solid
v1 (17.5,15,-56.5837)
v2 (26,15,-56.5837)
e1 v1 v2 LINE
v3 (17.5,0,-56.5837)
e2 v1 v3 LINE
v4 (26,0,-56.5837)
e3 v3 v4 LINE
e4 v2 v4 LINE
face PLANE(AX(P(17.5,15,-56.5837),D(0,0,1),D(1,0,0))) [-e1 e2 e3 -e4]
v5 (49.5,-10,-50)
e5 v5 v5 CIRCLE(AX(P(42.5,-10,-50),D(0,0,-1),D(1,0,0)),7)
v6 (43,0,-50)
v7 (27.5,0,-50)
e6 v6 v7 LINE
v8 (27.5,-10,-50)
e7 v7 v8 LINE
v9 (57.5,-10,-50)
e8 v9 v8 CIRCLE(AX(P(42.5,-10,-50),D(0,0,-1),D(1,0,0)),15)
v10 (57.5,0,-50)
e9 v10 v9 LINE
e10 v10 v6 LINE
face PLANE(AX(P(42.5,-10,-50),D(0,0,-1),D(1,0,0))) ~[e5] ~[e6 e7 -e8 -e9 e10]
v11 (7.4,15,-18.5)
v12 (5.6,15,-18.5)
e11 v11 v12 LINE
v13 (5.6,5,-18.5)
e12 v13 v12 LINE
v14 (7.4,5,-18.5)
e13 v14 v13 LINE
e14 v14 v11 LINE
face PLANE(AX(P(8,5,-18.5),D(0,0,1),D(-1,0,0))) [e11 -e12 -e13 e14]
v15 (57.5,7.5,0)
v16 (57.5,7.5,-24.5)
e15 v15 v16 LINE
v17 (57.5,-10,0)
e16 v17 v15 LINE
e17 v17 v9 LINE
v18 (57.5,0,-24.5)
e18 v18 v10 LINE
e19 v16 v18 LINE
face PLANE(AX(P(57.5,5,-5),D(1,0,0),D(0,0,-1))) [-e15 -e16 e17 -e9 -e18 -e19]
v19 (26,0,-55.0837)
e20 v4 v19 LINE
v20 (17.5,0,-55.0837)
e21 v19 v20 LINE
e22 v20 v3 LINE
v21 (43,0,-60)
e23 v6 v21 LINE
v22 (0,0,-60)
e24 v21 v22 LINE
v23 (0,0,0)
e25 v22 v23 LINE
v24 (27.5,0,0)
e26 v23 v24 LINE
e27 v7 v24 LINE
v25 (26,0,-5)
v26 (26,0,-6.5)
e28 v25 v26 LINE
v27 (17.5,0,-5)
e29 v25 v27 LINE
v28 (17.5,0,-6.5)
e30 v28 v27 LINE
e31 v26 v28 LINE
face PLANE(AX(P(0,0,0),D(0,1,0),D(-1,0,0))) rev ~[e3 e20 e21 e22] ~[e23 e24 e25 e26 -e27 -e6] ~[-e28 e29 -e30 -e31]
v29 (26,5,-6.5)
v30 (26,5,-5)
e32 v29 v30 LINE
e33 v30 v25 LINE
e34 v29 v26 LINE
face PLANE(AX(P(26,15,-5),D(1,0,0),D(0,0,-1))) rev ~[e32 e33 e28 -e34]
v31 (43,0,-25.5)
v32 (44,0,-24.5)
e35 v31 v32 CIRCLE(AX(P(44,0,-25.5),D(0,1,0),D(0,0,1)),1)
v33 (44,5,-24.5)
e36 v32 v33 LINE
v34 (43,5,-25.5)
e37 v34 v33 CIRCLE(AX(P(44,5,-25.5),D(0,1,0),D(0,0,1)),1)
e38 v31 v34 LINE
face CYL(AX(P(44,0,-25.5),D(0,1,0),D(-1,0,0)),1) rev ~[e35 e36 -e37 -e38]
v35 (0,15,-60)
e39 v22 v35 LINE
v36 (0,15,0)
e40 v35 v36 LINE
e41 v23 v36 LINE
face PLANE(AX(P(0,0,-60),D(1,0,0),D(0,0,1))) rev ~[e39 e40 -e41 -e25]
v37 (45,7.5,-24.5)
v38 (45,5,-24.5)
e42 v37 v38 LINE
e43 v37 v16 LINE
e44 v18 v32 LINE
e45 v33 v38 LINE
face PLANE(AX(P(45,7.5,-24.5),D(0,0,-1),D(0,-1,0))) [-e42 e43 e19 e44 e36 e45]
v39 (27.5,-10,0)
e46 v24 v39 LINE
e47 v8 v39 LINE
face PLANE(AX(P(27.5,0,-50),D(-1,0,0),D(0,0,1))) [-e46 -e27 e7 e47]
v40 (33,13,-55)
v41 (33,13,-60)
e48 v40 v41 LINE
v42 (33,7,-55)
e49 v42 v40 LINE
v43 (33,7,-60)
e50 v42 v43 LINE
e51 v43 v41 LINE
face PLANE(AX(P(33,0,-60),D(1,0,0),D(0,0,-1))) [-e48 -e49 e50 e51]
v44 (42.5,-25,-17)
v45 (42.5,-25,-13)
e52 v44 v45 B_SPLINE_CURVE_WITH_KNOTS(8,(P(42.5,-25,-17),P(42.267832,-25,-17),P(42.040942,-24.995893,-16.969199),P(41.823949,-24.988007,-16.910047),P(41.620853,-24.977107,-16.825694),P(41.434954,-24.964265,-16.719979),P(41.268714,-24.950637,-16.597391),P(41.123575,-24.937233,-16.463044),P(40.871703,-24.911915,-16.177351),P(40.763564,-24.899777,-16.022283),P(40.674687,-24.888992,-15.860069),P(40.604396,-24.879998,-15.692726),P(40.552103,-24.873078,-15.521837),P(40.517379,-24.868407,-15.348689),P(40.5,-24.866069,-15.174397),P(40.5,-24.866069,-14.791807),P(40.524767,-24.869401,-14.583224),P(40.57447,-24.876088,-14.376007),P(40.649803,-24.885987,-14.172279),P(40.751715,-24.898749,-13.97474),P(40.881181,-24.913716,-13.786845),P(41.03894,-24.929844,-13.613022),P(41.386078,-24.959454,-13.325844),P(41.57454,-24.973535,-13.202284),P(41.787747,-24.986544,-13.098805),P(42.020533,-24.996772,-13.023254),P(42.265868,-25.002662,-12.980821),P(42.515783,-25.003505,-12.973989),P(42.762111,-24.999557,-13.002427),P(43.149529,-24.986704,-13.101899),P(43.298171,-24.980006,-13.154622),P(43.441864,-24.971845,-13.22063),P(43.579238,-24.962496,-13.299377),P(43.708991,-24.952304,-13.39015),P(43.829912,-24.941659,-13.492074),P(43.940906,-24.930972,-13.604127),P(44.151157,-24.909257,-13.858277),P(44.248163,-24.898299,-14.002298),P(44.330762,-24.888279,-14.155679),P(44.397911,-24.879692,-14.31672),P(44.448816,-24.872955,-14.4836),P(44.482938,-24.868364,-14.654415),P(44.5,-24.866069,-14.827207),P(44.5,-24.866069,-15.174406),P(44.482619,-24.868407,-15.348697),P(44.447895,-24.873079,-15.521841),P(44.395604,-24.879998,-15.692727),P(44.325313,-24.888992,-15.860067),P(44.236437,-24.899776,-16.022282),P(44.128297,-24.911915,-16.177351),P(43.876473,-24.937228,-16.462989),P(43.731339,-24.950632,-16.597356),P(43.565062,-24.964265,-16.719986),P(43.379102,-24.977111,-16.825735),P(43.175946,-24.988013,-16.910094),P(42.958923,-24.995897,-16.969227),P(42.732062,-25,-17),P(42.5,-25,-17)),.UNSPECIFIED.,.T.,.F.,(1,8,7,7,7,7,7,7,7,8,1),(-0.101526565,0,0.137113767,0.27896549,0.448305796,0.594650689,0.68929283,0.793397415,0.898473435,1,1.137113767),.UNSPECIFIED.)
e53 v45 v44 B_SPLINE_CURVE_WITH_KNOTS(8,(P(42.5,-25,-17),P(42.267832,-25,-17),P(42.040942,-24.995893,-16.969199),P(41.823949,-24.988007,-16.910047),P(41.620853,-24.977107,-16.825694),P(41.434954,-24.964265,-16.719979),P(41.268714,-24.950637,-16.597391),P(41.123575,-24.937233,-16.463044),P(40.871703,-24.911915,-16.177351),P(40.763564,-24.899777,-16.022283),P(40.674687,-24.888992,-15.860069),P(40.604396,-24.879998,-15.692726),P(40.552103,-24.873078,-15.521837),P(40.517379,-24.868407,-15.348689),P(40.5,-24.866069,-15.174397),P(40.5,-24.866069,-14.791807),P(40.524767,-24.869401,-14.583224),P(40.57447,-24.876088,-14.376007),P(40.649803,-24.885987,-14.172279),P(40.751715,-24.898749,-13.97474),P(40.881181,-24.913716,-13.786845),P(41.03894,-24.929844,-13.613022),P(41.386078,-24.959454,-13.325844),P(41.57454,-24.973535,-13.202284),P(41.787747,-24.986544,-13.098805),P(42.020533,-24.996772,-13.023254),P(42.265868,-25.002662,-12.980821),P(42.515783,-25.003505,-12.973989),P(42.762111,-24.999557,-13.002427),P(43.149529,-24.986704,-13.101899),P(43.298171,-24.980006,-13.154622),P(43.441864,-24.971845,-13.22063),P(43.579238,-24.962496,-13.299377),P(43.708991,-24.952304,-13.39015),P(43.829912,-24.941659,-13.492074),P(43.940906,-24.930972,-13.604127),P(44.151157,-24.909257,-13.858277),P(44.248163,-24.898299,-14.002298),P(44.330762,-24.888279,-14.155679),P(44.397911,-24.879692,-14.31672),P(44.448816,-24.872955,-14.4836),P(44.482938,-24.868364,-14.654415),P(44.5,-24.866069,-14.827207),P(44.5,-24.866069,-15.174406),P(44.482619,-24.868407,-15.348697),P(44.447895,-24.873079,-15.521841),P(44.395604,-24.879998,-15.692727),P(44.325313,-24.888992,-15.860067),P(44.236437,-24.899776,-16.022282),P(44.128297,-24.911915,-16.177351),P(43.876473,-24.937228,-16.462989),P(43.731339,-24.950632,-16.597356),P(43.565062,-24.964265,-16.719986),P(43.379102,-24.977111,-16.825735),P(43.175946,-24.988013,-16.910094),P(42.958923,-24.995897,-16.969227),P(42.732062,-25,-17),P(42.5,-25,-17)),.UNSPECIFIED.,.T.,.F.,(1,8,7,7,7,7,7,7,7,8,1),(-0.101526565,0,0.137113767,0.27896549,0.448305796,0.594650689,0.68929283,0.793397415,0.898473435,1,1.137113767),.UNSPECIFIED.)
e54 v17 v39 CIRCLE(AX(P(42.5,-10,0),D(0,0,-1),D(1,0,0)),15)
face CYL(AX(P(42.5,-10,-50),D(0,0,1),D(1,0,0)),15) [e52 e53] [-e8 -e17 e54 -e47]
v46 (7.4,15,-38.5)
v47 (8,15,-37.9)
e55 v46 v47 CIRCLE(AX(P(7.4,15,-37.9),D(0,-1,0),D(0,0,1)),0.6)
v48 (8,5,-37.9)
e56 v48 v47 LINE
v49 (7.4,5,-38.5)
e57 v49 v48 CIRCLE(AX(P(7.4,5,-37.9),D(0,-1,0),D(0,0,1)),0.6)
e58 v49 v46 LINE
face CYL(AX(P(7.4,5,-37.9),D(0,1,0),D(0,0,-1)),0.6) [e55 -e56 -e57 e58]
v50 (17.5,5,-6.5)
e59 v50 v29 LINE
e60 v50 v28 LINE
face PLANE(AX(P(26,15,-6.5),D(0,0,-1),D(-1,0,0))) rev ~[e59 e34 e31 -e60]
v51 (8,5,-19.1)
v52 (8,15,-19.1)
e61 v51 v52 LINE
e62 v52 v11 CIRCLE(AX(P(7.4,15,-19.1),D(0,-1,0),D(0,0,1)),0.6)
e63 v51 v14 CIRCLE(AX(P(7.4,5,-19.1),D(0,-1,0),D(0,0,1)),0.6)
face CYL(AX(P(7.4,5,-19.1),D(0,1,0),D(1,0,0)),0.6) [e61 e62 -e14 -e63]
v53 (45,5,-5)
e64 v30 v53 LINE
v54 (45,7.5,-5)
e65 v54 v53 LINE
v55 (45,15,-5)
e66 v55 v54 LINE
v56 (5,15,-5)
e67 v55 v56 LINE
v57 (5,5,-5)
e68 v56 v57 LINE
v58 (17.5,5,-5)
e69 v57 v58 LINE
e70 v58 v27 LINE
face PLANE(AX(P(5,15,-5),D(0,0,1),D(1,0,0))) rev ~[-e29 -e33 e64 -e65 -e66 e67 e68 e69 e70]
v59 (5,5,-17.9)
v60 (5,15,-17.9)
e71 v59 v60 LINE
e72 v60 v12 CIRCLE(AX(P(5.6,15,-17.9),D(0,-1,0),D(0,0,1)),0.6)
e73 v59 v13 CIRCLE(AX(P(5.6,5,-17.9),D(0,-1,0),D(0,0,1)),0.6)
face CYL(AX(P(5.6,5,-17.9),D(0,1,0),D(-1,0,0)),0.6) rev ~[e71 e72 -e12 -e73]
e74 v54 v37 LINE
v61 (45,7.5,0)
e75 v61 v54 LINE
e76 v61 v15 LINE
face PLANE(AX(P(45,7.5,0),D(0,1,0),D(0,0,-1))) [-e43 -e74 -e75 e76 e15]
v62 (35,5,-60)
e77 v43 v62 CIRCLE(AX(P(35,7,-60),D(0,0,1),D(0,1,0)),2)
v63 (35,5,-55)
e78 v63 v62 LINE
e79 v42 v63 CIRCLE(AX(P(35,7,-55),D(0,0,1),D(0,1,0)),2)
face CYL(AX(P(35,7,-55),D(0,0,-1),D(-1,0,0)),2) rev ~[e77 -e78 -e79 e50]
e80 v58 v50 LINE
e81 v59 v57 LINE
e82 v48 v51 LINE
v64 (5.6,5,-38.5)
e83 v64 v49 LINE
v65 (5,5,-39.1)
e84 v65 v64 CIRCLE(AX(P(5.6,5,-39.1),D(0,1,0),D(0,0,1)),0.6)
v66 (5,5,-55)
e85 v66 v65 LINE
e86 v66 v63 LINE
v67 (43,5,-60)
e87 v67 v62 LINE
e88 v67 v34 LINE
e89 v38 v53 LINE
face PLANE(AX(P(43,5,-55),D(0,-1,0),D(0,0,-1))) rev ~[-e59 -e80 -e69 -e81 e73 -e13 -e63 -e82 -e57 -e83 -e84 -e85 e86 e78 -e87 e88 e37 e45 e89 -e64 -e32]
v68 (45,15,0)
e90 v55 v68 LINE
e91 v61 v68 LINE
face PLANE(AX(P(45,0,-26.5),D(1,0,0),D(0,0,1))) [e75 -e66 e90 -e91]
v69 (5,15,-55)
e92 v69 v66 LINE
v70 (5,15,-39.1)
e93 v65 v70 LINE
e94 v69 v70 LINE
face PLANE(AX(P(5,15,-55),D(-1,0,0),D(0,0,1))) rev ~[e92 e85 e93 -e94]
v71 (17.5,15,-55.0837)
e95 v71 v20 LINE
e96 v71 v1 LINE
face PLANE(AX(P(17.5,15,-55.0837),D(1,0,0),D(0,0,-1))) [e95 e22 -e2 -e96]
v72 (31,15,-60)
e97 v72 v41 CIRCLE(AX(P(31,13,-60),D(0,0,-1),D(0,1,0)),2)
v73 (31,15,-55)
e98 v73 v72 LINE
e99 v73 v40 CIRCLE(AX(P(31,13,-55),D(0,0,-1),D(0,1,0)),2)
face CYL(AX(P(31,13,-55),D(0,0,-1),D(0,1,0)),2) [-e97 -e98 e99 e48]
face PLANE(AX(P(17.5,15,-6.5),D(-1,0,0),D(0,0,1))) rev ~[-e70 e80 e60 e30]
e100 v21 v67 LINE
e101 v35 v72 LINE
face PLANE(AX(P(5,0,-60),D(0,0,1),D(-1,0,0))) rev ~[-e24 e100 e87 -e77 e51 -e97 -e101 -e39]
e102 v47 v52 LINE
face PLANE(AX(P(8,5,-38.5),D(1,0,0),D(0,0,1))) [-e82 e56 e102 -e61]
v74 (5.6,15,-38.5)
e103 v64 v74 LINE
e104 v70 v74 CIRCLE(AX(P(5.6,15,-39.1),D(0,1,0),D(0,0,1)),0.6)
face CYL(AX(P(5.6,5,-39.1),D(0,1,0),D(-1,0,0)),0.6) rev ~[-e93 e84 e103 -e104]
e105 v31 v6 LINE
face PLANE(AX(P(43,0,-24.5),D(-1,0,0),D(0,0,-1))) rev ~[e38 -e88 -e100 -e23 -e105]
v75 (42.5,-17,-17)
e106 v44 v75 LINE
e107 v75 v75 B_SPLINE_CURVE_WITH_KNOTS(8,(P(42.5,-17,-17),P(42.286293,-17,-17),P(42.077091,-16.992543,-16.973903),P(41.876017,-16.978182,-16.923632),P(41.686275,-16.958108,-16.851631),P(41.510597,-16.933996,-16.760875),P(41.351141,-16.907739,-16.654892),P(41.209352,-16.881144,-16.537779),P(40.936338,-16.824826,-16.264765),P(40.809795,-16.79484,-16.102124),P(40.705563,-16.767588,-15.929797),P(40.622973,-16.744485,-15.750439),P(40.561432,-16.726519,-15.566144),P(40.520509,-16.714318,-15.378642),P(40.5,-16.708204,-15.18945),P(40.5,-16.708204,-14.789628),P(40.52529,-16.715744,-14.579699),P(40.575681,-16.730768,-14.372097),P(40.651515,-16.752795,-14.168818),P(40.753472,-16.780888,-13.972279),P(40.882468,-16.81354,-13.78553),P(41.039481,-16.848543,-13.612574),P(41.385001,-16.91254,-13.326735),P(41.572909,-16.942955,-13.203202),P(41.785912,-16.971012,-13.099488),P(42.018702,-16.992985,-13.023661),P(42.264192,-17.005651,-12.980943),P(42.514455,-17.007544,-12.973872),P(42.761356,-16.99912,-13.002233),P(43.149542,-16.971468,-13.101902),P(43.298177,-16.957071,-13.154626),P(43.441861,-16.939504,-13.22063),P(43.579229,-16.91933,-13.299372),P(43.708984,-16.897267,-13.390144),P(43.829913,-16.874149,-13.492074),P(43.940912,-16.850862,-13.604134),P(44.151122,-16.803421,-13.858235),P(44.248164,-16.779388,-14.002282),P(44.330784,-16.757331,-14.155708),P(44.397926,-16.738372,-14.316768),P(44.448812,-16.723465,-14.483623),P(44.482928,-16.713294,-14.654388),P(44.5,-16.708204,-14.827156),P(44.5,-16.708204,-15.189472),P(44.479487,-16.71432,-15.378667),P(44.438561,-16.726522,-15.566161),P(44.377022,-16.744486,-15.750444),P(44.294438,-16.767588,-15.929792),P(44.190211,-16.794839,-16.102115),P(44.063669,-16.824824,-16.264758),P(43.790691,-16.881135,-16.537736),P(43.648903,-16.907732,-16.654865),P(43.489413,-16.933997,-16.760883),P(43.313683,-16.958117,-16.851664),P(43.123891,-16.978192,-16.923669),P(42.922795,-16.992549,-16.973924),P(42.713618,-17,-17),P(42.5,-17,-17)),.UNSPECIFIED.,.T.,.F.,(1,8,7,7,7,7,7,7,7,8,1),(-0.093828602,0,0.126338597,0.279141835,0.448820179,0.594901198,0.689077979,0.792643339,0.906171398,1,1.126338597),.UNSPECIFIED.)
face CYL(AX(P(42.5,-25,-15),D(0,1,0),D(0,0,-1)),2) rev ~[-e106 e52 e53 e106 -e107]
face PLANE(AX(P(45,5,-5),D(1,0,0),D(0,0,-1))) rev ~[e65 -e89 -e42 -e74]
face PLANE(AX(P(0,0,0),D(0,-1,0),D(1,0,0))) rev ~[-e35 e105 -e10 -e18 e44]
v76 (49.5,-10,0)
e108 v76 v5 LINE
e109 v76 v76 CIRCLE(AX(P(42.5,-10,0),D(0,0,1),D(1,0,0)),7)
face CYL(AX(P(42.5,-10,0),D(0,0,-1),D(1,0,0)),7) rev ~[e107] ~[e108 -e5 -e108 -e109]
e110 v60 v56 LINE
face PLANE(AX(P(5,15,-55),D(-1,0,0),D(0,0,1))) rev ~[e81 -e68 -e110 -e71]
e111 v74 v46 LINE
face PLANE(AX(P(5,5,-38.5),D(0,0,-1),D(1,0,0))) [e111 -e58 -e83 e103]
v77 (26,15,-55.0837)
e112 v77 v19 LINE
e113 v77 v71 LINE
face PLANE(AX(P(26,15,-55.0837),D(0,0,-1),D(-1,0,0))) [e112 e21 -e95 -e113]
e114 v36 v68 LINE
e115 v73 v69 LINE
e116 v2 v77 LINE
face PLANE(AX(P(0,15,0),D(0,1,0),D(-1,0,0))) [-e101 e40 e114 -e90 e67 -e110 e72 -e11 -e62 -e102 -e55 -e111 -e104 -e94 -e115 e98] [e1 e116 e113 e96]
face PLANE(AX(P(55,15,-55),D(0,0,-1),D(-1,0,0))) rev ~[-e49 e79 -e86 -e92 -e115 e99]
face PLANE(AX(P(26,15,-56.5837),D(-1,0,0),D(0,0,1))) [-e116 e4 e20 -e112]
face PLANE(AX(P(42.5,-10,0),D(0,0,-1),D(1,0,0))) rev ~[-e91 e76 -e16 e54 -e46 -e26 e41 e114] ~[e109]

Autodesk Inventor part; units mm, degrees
ref_plane "YZ Plane" through (0, 0, 0) normal (1, 0, 0) x (0, 1, 0)
ref_plane "XZ Plane" through (0, 0, 0) normal (0, 1, 0) x (-1, 0, 0)
sketch "Sketch1" plane through (0, 0, 0) normal (0, 1, 0) x (-1, 0, 0)
  line L0 (0, 0) -> (0, -60)
  line L1 (0, 0) -> (-50, 0)
  line L2 (-5, -60) -> (-5, -5)
  line L3 (-5, -5) -> (-50, -5)
  line L4 (-47.5, 69.0442) -> (-47.5, -71.5611) construction
  line L5 (-50, 0) -> (-55, 0)
  line L6 (-55, 0) -> (-55, -50)
  line L7 (-55, -50) -> (-75, -50)
  line L8 (-75, -50) -> (-75, -60)
  line L9 (-75, -60) -> (-45, -60)
  line L10 (-5, -60) -> (-21, -60)
  circle A0 centre (-47.5, -73.124) radius 8.5
  line L11 (16.7028, -43.5) -> (-102.7124, -43.5) construction
  line L12 (-45, -26.5) -> (-50, -26.5)
  line L13 (-50, -26.5) -> (-50, -60.5)
  line L14 (-50, -60.5) -> (-45, -60.5)
  line L15 (-45, -60.5) -> (-45, -26.5)
  line L16 (-45, -43.5) -> (-50, -43.5) construction
  line L17 (-21, -60) -> (-21, -67.124)
  line L18 (-21, -67.124) -> (-30, -67.124)
  line L19 (-39, -67.124) -> (-39, -60)
  line L20 (-39, -60) -> (-45, -60) construction
  line L21 (-15.952, -100.4576) -> (-35.952, -100.4576)
  line L22 (-35.952, -108.4576) -> (-15.952, -108.4576)
  line L23 (-15.952, -108.4576) -> (-15.952, -100.4576)
  line L24 (-15.952, -73.124) -> (-76.4965, -73.124) construction
  line L25 (-30, -57.9879) -> (-30, -83.8601) construction
  line L26 (-25.952, -100.4576) -> (-25.952, -108.4576) construction
  line L27 (-45, -31) -> (-50, -31) construction
  line L28 (-50, -31) -> (-50, -56)
  line L29 (-50, -56) -> (-45, -56) construction
  line L30 (-45, -56) -> (-45, -31)
  line L31 (-45, -56) -> (-50, -56)
  line L32 (-45, -65.1391) -> (-45, -56)
  line L33 (-45, -56) -> (-50, -56)
  line L34 (-50, -56) -> (-50, -65)
  line L35 (-50, -65) -> (-45, -65)
  line L36 (-45, -65) -> (-45, -56)
  arc A1 (-35.952, -108.4576) -> (-35.952, -100.4576) centre (-43.452, -104.4576) ccw
  line L37 (-30, -67.124) -> (-39, -67.124)
  point P0 (-47.5, -43.5)
  point P1 (-30, -73.124)
  dimension "d9" = 17
  dimension "d0" = 60
  dimension "d1" = 50
  dimension "d2" = 5
  dimension "d3" = 47.5
  dimension "d4" = 5
  dimension "d5" = 50
  dimension "d6" = 20
  dimension "d7" = 30
  dimension "d10" = 38.5
  dimension "d11" = 5
  dimension "d12" = 34
  dimension "d13" = 20
  dimension "d14" = 8
  dimension "d57" = 25
  dimension "d58" = 4.5
  dimension "d59" = 5
  dimension "d60" = 9
  dimension "d61" = 17
  dimension "d62" = 9
  dimension "d63" = 9
  dimension "d64" = 9
  dimension "d65" = 6
sketch "Sketch2" plane through (0, 0, 0) normal (0, 1, 0) x (-1, 0, 0)
  line L0 (0, 0) -> (-45, 0)
  line L1 (-45, -60) -> (0, -60)
  line L2 (0, -60) -> (0, 0)
  line L3 (-5, -60) -> (-21, -60) projected
  line L4 (-30, -67.124) -> (-39, -67.124) projected
  line L5 (-57.5, -67.124) -> (-72, -67.124)
  line L6 (-72, -67.124) -> (-72, -59.124)
  line L7 (-72, -59.124) -> (-60, -59.124)
  line L8 (-60, -59.124) -> (-60, 0)
  line L9 (-57.5, -67.124) -> (-57.5, -60)
  line L10 (-45, -60.5) -> (-45, -26.5) projected
  line L11 (-45, -60) -> (-45, 0)
  point P0 (-60, -55)
  point P1 (-60, -67.124)
  dimension "d16" = 57.5
  dimension "d73" = 8
extrude "Extrusion1" add sketch "Sketch2" along normal blind 15
sketch "Sketch3" plane through (0, 15, 0) normal (0, 1, 0) x (1, 0, 0)
  line L0 (5, 5) -> (55, 5)
  line L1 (55, 5) -> (55, 55)
  line L2 (55, 55) -> (5, 55)
  line L3 (5, 55) -> (5, 5)
  line L4 (0, 0) -> (45, 0) projected
  line L5 (0, 60) -> (0, 0) projected
  point P0 (60, 0)
  dimension "d23" = 5
  dimension "d24" = 5
  dimension "d25" = 50
  dimension "d26" = 50
extrude "Extrusion2" cut sketch "Sketch3" against normal blind 10
sketch "Sketch5" plane through (0, 0, 0) normal (0, -1, 0) x (1, 0, 0)
  line L0 (45, -60) -> (0, -60) projected
  line L1 (45, -60.5) -> (45, -26.5) projected
  line L2 (5, -60) -> (5, -5) projected
  line L3 (50, -26.5) -> (50, -60.5) projected
  line L4 (45, -26.5) -> (50, -26.5) projected
  line L5 (50, -60.5) -> (45, -60.5) projected
  line L6 (52, -60) -> (52, -24.5)
  line L7 (52, -24.5) -> (43, -24.5)
  line L8 (43, -24.5) -> (43, -60)
  line L9 (52, -60.5) -> (52, -60)
  line L10 (52, -60) -> (43, -60)
  point P0 (80, -60)
  point P1 (57.5, -60)
  dimension "d30" = 40
  dimension "d31" = 2
extrude "Extrusion3" cut sketch "Sketch5" against normal through all contours L0 L8 L7 L6 L10 L3 L4 L1 | L1 L4 L3 L10
sketch "Sketch8" plane through (0, 5, 0) normal (0, 1, 0) x (1, 0, 0)
  line L0 (36, 11.5) -> (39, 11.5)
  line L1 (39, 11.5) -> (39, 43.5)
  line L2 (39, 43.5) -> (36, 43.5)
  line L3 (36, 43.5) -> (36, 11.5)
  line L4 (45, 60.5) -> (45, 26.5) projected
  line L5 (-16.7028, 43.5) -> (102.7124, 43.5) construction
  point P0 (0, 0)
  point P1 (47.5, 43.5)
  dimension "d45" = 6
  dimension "d46" = 32
  dimension "d47" = 3
extrude "Extrusion5" [suppressed]
sketch "Sketch9" plane through (0, 5, 0) normal (0, 1, 0) x (1, 0, 0)
  line L0 (36, 43.5) -> (39, 43.5) projected
  line L1 (5, 5) -> (5, 55) projected
  line L2 (8, 18.5) -> (5, 18.5)
  line L3 (5, 18.5) -> (5, 38.5)
  line L4 (5, 38.5) -> (8, 38.5)
  line L5 (8, 38.5) -> (8, 18.5)
  point P0 (0, 0)
  dimension "d50" = 3
  dimension "d51" = 5
  dimension "d52" = 20
extrude "Extrusion6" add sketch "Sketch9" along normal up to surface (10 mm away)
fillet "Fillet1" radius 0.6 4 edges at (5, 10, -38.5) (8, 10, -38.5) (8, 10, -18.5) (5, 10, -18.5)
fillet "Fillet2" radius 1 1 edges at (43, 2.5, -24.5)
sketch "Sketch15" plane through (0, 0, 0) normal (0, -1, 0) x (1, 0, 0)
  line L0 (0, 0) -> (45, 0) projected
  line L1 (27.5, 0) -> (57.5, 0)
  line L2 (57.5, 0) -> (57.5, -50)
  line L3 (57.5, -50) -> (27.5, -50)
  line L4 (27.5, -50) -> (27.5, 0)
  line L5 (42.5, -50) -> (42.5, 0) construction
  line L6 (47.5, 69.0442) -> (47.5, -71.5611) construction
  line L7 (0, -60) -> (0, 0) projected
  dimension "d87" = 30
  dimension "d90" = 50
  dimension "d127" = 27.5
extrude "Extrusion11" add sketch "Sketch15" along normal blind 10
sketch "Sketch17" plane through (45, 5, -5) normal (1, 0, 0) x (0, 0, -1)
  line L0 (-5, -5) -> (-5, 10) projected
  line L1 (-5, -5) -> (19.5, -5) projected
  line L2 (-5, 2.5) -> (19.5, 2.5)
  line L3 (19.5, 2.5) -> (19.5, -5)
  line L4 (19.5, -5) -> (-5, -5)
  line L5 (-5, -5) -> (-5, 2.5)
extrude "Extrusion13" add sketch "Sketch17" along normal up to surface (12.5 mm away)
sketch "Sketch18" plane through (0, -10, 0) normal (0, -1, 0) x (1, 0, 0)
  line L0 (27.5, -50) -> (57.5, -50) projected
  line L1 (57.5, 0) -> (27.5, 0) projected
  line L2 (42.5, 0) -> (42.5, -50) construction
  line L3 (43, -50) -> (57.5, -50) projected
  line L4 (57.5, 0) -> (49.5, 0)
  line L5 (49.5, 0) -> (49.5, -50)
  line L6 (49.5, -50) -> (57.5, -50)
  line L7 (57.5, -50) -> (57.5, 0)
  point P0 (0, 0)
  dimension "d95" = 7
revolve "Revolution1" add sketch "Sketch18" angle 180 about axis through (42.5, -10, 0) along (0, 0, -1)
hole "Hole2" at (42.5, -10, 0) direction (0, 0, -1) diameter 14 end through all
ref_plane "Work Plane2" through (42.5, -25, -25) normal (0, -1, 0) x (1, 0, 0)
sketch "Sketch19" plane through (42.5, -25, -25) normal (0, -1, 0) x (1, 0, 0)
  line L0 (-15, 25) -> (-15, -25) projected
  line L1 (15, -25) -> (-15, -25) projected
  line L2 (15, -25) -> (15, 25) projected
  line L3 (15, 25) -> (-15, 25) projected
  line L4 (0, 10) -> (-15, 10)
  line L5 (-15, -25) -> (-15, 25) projected
  line L6 (0, 10) -> (15, 10)
  point P0 (-42.5, 25)
  dimension "d106" = 15
hole "Hole3" at (42.5, -25, -15) direction (0, 1, 0) diameter 4 end up to surface
sketch "Sketch20" plane through (43, 0, -60) normal (1, 0, 0) x (0, 0, -1)
  line L0 (-34.5, 0) -> (-34.5, 5) projected
  line L1 (-10, 0) -> (-34.5, 0) projected
  line L2 (0, 0) -> (-34.5, 0) projected
  line L3 (0, 15) -> (0, 0) projected
  line L4 (-5, 15) -> (0, 15) projected
  line L5 (-5, 5) -> (-5, 15) projected
  line L6 (-34.5, 5) -> (-5, 5) projected
  line L7 (-10, -3) -> (-10, -17) projected
  line L8 (-10, -10) -> (-60, -10) projected
  line L9 (-5, 5) -> (-55, 5)
  line L10 (-55, 5) -> (-55, 31)
  line L11 (-55, 31) -> (-5, 31)
  line L12 (-5, 31) -> (-5, 5)
  circle A0 centre (-16, 23) radius 11
  circle A1 centre (-16, 23) radius 18
  point P0 (-60, 0)
  dimension "d114" = 50
  dimension "d115" = 26
  dimension "d116" = 22
  dimension "d117" = 33
  dimension "d129" = 36
sketch "Sketch21" plane through (43, 0, -60) normal (1, 0, 0) x (0, 0, -1)
  line L0 (-5, 15) -> (0, 15) projected
  line L1 (-5, 5) -> (-5, 15) projected
  line L2 (-20.9, 5) -> (-5, 5) projected
  line L3 (0, 5) -> (0, 15)
  line L4 (0, 15) -> (-5, 15)
  line L5 (-5, 15) -> (-5, 5)
  line L6 (-5, 5) -> (0, 5)
  point P0 (-60, 0)
extrude "Extrusion14" cut sketch "Sketch21" against normal blind 10
fillet "Fillet3" radius 2 2 edges at (33, 5, -57.5) (33, 15, -57.5)
sketch "Sketch22" plane through (0, 5, 0) normal (0, 1, 0) x (1, 0, 0)
  line L0 (35, 55) -> (35, 60) projected
  line L1 (5, 55) -> (35, 55) projected
  line L2 (5, 39.1) -> (5, 55) projected
  arc A0 (5, 39.1) -> (5.6, 38.5) centre (5.6, 39.1) ccw projected
  line L3 (5.6, 38.5) -> (7.4, 38.5) projected
  arc A1 (8, 37.9) -> (7.4, 38.5) centre (7.4, 37.9) ccw projected
  line L4 (8, 37.9) -> (8, 19.1) projected
  arc A2 (7.4, 18.5) -> (8, 19.1) centre (7.4, 19.1) ccw projected
  line L5 (7.4, 18.5) -> (5.6, 18.5) projected
  arc A3 (5.6, 18.5) -> (5, 17.9) centre (5.6, 17.9) ccw projected
  line L6 (5, 5) -> (5, 17.9) projected
  line L7 (45, 5) -> (5, 5) projected
  line L8 (45, 0) -> (45, 5) projected
  line L9 (45, 0) -> (57.5, 0) projected
  line L10 (57.5, 0) -> (57.5, 24.5) projected
  line L11 (57.5, 24.5) -> (44, 24.5) projected
  arc A4 (43, 25.5) -> (44, 24.5) centre (44, 25.5) ccw projected
  line L12 (43, 60) -> (43, 25.5) projected
  line L13 (35, 60) -> (43, 60) projected
  line L14 (39, 43.5) -> (39, 11.5) projected
  line L15 (39, 11.5) -> (36, 11.5) projected
  line L16 (36, 11.5) -> (36, 43.5) projected
  line L17 (36, 43.5) -> (39, 43.5) projected
  line L18 (49.5, 0) -> (35.5, 0) projected
  line L19 (35.5, 50) -> (49.5, 50) projected
  line L20 (35.5, 50) -> (49.5, 50) projected
  line L21 (57.5, 50) -> (27.5, 50) projected
  line L22 (43, 50) -> (27.5, 50) projected
  line L23 (43, 50) -> (57.5, 50) projected
  line L24 (35.5, 50) -> (49.5, 50) projected
  line L25 (42.5, 50) -> (42.5, 0) construction
  line L26 (49.5, 0) -> (35.5, 0) projected
  line L27 (5, 55) -> (45, 55)
  line L28 (45, 55) -> (45, 5)
  line L29 (45, 5) -> (5, 5)
  line L30 (5, 5) -> (5, 55)
  line L31 (45, 55) -> (51, 55)
  line L32 (51, 55) -> (51, 33)
  line L33 (51, 33) -> (45, 33)
  line L34 (45, 33) -> (45, 55)
  line L35 (48, 55) -> (48, 33) construction
  point P0 (0, 0)
  point P1 (45, 24.5)
  dimension "d121" = 40
  dimension "d122" = 50
  dimension "d123" = 40
  dimension "d124" = 6
  dimension "d125" = 22
  dimension "d128" = 5.5
sketch "Sketch23" plane through (0, 15, 0) normal (0, 1, 0) x (1, 0, 0)
  line L0 (45, 5) -> (5, 5) projected
  line L1 (33, 55) -> (31, 55) projected
  line L2 (26, 6.5) -> (17.5, 6.5)
  line L3 (17.5, 6.5) -> (17.5, 5)
  line L4 (17.5, 5) -> (26, 5)
  line L5 (26, 5) -> (26, 6.5)
  line L6 (31, 60) -> (31, 55) projected
  line L7 (17.5, 56.5837) -> (26, 56.5837)
  line L8 (26, 56.5837) -> (26, 55.0837)
  line L9 (26, 55.0837) -> (17.5, 55.0837)
  line L10 (17.5, 55.0837) -> (17.5, 56.5837)
  dimension "d131" = 1.5
  dimension "d134" = 8.5
  dimension "d135" = 1.5
  dimension "d136" = 5
  dimension "d137" = 8.5
extrude "Extrusion15" cut sketch "Sketch23" against normal through all
properties part number "HousingV2"
